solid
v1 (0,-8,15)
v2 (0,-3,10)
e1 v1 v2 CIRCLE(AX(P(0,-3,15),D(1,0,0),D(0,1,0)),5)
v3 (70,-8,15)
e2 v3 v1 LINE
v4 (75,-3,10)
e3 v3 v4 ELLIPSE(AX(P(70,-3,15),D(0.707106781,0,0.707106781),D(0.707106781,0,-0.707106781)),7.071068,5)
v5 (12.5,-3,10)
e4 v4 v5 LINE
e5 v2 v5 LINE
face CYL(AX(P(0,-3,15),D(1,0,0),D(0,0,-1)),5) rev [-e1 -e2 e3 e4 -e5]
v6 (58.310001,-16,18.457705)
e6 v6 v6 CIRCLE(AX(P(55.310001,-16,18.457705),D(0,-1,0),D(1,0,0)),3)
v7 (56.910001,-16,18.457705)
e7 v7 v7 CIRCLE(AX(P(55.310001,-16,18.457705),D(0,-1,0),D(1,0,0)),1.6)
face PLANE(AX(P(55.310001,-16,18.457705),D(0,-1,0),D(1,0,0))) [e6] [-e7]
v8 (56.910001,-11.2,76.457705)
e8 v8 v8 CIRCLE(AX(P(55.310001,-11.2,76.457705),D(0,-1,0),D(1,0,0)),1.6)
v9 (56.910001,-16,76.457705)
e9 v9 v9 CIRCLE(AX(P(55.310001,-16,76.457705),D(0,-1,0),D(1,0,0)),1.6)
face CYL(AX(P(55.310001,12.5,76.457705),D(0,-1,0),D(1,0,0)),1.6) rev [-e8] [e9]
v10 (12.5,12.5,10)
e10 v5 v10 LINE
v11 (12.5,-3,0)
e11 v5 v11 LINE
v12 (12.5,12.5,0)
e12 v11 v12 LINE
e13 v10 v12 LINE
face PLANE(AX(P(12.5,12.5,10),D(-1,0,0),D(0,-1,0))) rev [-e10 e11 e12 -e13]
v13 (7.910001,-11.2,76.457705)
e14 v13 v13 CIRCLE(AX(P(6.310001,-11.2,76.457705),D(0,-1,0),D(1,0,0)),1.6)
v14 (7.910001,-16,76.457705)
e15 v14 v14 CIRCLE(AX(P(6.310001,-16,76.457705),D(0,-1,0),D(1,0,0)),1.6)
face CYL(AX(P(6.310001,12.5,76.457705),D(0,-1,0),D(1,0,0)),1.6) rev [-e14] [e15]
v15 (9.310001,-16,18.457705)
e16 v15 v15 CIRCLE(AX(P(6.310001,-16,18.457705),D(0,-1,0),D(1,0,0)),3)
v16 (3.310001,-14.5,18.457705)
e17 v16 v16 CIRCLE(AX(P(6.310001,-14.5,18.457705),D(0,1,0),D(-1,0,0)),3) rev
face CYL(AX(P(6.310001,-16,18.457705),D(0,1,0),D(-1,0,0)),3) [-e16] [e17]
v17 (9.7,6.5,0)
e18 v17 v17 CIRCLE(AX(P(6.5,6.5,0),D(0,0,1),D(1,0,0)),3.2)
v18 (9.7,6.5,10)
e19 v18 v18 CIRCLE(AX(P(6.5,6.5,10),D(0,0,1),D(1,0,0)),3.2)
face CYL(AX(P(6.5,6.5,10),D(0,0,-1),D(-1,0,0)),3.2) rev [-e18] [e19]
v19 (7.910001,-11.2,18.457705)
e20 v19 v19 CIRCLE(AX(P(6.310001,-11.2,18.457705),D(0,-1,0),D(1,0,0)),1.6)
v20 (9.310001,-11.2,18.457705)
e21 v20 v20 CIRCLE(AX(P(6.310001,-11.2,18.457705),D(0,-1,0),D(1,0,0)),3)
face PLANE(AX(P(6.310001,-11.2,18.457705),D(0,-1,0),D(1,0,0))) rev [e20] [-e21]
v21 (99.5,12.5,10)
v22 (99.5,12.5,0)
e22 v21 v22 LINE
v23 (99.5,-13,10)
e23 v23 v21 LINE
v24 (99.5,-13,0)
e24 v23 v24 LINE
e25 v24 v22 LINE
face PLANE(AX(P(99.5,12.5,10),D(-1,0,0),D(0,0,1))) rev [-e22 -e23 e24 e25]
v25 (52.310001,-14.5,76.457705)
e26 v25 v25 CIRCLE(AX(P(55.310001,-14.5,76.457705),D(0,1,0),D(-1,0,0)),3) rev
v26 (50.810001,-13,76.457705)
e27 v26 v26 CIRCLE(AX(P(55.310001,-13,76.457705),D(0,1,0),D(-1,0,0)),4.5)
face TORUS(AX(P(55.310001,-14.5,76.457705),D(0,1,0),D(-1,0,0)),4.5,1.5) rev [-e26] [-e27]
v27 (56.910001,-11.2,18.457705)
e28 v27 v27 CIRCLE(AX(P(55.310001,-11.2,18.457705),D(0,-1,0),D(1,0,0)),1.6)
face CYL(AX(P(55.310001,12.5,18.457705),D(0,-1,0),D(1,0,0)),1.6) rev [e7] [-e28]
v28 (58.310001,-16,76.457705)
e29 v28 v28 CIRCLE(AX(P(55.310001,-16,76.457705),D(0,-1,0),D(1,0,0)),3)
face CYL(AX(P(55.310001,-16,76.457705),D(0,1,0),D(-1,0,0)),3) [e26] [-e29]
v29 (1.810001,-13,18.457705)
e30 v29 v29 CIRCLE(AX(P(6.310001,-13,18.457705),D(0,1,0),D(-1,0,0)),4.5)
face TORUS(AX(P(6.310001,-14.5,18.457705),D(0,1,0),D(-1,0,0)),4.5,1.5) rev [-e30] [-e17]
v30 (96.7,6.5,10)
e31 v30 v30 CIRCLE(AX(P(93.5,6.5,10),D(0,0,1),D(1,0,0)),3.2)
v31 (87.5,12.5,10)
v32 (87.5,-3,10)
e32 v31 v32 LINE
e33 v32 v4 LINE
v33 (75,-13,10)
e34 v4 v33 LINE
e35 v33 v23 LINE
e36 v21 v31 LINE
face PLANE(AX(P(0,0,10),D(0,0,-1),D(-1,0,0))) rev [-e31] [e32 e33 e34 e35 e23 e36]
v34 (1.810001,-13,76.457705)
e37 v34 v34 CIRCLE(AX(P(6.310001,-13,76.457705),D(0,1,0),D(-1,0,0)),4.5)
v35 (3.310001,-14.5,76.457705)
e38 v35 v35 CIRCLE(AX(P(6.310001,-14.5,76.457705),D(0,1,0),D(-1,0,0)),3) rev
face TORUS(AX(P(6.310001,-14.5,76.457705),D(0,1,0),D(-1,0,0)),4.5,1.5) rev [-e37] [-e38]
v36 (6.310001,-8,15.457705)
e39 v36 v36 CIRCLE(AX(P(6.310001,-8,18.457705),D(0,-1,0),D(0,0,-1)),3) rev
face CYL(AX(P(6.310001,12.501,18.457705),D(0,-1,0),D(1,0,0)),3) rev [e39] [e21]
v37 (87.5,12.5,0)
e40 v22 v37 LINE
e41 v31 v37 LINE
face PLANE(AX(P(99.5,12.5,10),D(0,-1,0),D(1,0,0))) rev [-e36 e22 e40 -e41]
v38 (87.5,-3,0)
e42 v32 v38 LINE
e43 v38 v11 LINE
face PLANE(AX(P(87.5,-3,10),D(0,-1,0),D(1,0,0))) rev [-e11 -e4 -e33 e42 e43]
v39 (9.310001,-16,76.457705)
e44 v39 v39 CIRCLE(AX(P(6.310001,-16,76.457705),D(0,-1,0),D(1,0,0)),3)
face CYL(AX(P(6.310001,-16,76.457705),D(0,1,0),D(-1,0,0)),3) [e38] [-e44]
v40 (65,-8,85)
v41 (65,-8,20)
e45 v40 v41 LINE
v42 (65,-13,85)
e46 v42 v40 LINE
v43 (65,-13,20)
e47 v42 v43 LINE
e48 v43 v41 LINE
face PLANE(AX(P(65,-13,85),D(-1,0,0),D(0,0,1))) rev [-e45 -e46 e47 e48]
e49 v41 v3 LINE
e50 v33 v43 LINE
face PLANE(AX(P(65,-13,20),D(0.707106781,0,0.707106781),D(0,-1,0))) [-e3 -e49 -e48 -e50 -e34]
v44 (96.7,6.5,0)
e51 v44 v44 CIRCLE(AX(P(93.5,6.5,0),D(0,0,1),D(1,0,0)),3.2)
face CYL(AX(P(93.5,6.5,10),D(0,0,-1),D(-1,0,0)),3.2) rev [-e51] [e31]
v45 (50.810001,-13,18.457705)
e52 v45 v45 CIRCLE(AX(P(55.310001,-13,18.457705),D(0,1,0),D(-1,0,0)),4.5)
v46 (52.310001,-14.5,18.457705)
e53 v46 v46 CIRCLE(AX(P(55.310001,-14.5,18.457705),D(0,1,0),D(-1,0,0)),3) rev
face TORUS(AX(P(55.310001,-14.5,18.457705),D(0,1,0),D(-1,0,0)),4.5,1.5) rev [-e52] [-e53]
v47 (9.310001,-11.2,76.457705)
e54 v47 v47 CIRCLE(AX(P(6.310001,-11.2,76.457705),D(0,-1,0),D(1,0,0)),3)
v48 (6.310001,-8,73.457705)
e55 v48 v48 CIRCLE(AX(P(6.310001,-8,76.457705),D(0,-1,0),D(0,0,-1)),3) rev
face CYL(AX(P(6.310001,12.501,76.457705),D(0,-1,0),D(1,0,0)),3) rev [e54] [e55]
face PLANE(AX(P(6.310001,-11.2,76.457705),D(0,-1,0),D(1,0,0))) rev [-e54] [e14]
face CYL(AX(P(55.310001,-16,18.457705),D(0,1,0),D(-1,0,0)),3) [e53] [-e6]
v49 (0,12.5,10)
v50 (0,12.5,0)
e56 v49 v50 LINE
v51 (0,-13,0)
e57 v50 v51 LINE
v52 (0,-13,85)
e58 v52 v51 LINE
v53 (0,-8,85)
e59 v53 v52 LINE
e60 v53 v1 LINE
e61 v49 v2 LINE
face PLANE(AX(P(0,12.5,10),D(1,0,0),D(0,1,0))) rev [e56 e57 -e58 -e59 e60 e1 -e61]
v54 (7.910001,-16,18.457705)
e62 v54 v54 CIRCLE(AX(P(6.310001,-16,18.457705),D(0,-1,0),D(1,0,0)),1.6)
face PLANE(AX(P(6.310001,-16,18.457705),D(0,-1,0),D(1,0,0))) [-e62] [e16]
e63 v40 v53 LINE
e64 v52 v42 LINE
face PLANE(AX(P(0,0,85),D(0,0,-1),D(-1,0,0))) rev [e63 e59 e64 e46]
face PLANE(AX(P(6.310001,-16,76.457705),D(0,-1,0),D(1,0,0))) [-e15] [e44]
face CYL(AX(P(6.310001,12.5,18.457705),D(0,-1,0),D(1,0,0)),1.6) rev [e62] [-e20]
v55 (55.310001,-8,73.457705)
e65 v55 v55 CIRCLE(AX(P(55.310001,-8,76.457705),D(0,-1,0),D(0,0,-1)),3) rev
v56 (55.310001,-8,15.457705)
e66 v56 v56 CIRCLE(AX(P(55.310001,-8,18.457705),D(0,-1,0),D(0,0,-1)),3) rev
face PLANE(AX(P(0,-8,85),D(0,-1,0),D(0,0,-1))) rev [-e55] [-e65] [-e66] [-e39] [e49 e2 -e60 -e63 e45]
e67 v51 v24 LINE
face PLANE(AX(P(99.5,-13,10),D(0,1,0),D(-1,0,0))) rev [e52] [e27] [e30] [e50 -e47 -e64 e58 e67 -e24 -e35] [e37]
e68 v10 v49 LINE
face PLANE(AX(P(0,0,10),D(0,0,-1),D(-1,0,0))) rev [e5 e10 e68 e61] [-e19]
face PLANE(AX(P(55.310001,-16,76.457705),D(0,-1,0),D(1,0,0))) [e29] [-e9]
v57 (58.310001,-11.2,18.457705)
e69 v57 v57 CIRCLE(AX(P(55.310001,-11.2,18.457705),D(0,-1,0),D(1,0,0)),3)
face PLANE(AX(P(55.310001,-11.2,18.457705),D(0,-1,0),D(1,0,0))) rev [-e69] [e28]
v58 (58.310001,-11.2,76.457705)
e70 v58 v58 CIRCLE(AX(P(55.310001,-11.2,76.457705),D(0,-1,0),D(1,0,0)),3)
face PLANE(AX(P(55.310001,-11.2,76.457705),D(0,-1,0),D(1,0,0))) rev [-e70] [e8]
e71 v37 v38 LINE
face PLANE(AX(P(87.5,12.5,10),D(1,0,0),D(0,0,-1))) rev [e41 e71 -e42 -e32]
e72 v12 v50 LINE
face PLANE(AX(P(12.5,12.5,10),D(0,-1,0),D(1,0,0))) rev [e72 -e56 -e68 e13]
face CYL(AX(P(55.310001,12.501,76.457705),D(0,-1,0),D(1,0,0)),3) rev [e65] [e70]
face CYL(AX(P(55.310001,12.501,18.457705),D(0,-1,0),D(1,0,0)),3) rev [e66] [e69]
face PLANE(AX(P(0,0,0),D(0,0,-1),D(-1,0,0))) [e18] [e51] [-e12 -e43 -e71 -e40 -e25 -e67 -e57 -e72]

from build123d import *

# Parameters (mm, degrees)
SKETCH1_R               = 3.2
BOSS_EXTRUDE1_DEPTH     = 10
SKETCH2_W               = 65
SKETCH2_H               = 5
BOSS_EXTRUDE2_DEPTH     = 75
SKETCH4_R               = 3
BOSS_EXTRUDE3_DEPTH     = 3
CUT_EXTRUDE1_REACH      = 137.125
CUT_EXTRUDE1_START      = -1.8
SKETCH4_2_R             = 3
CUT_EXTRUDE2_DEPTH      = 134.324791393
CUT_EXTRUDE2_DEPTH_BACK = 134.324791393
SKETCH3_R               = 1.6
FILLET1_R               = 5
CHAMFER1_SIZE           = 10
FILLET2_R               = 1.5


with BuildPart() as part:
    # Sketch1 → Boss-Extrude1 (new body)
    with BuildSketch(Plane.XY):
        Polygon((99.5, 12.5), (87.5, 12.5), (87.5, -3), (12.5, -3), (12.5, 12.5), (0, 12.5), (0, -13), (99.5, -13), align=None)
        with Locations((93.5, 6.5)):
            Circle(SKETCH1_R, mode=Mode.SUBTRACT)
        with Locations((6.5, 6.5)):
            Circle(SKETCH1_R, mode=Mode.SUBTRACT)
    extrude(amount=BOSS_EXTRUDE1_DEPTH)

    # Sketch2 → Boss-Extrude2 (add)
    with BuildSketch(Plane.XY.offset(10)):
        with Locations((32.5, -10.5)):
            Rectangle(SKETCH2_W, SKETCH2_H)
    extrude(amount=BOSS_EXTRUDE2_DEPTH)

    # Sketch4 → Boss-Extrude3 (add)
    with BuildSketch(Plane.XZ.offset(13)):
        with Locations(Location((6.31000124, 76.457704619, 0), (0, 0, 180))):
            Circle(SKETCH4_R)
        with Locations(Location((55.31000124, 76.457704619, 0), (0, 0, 180))):
            Circle(SKETCH4_R)
        with Locations(Location((55.31000124, 18.457704619, 0), (0, 0, 180))):
            Circle(SKETCH4_R)
        with Locations(Location((6.31000124, 18.457704619, 0), (0, 0, 180))):
            Circle(SKETCH4_R)
    extrude(amount=BOSS_EXTRUDE3_DEPTH)

    # Sketch4<2> → Cut-Extrude1 (cut, up to next)
    with BuildSketch(Plane.XZ.offset(13).offset(CUT_EXTRUDE1_START), mode=Mode.PRIVATE) as cut_extrude1_sk1:
        with Locations(Location((6.31000124, 76.457704619, 0), (0, 0, 180))):
            Circle(SKETCH4_2_R)
    cut_extrude1_tool1 = extrude(cut_extrude1_sk1.sketch, amount=-CUT_EXTRUDE1_REACH, mode=Mode.PRIVATE) & part.part
    # Sketch4<2> → Cut-Extrude1 (cut, up to next)
    with BuildSketch(Plane.XZ.offset(13).offset(CUT_EXTRUDE1_START), mode=Mode.PRIVATE) as cut_extrude1_sk2:
        with Locations(Location((55.31000124, 76.457704619, 0), (0, 0, 180))):
            Circle(SKETCH4_2_R)
    cut_extrude1_tool2 = extrude(cut_extrude1_sk2.sketch, amount=-CUT_EXTRUDE1_REACH, mode=Mode.PRIVATE) & part.part
    # Sketch4<2> → Cut-Extrude1 (cut, up to next)
    with BuildSketch(Plane.XZ.offset(13).offset(CUT_EXTRUDE1_START), mode=Mode.PRIVATE) as cut_extrude1_sk3:
        with Locations(Location((55.31000124, 18.457704619, 0), (0, 0, 180))):
            Circle(SKETCH4_2_R)
    cut_extrude1_tool3 = extrude(cut_extrude1_sk3.sketch, amount=-CUT_EXTRUDE1_REACH, mode=Mode.PRIVATE) & part.part
    # Sketch4<2> → Cut-Extrude1 (cut, up to next)
    with BuildSketch(Plane.XZ.offset(13).offset(CUT_EXTRUDE1_START), mode=Mode.PRIVATE) as cut_extrude1_sk4:
        with Locations(Location((6.31000124, 18.457704619, 0), (0, 0, 180))):
            Circle(SKETCH4_2_R)
    cut_extrude1_tool4 = extrude(cut_extrude1_sk4.sketch, amount=-CUT_EXTRUDE1_REACH, mode=Mode.PRIVATE) & part.part
    add(cut_extrude1_tool1.solids().sort_by_distance((6.310001, -11.2, 76.457705))[0], mode=Mode.SUBTRACT)
    add(cut_extrude1_tool2.solids().sort_by_distance((55.310001, -11.2, 76.457705))[0], mode=Mode.SUBTRACT)
    add(cut_extrude1_tool3.solids().sort_by_distance((55.310001, -11.2, 18.457705))[0], mode=Mode.SUBTRACT)
    add(cut_extrude1_tool4.solids().sort_by_distance((6.310001, -11.2, 18.457705))[0], mode=Mode.SUBTRACT)

    # Sketch3 → Cut-Extrude2 (cut, two sides: drawn at the far end of the back side and taken through both)
    with BuildSketch(Plane.XZ.offset(13).offset(-CUT_EXTRUDE2_DEPTH_BACK)):
        with Locations((6.31000124, 76.457704619)):
            Circle(SKETCH3_R)
        with Locations((55.31000124, 76.457704619)):
            Circle(SKETCH3_R)
        with Locations((6.31000124, 18.457704619)):
            Circle(SKETCH3_R)
        with Locations((55.31000124, 18.457704619)):
            Circle(SKETCH3_R)
    extrude(amount=CUT_EXTRUDE2_DEPTH + CUT_EXTRUDE2_DEPTH_BACK, mode=Mode.SUBTRACT)

    # Fillet1
    fillet1_edges = [part.edges().sort_by_distance(p)[0] for p in [
        (32.5, -8, 10),
    ]]
    fillet(fillet1_edges, radius=FILLET1_R - 0.0001)  # a hair under: the kernel refuses the full size

    # Chamfer1
    chamfer1_edges = [part.edges().sort_by_distance(p)[0] for p in [
        (65, -8.00005, 10),
    ]]
    chamfer(chamfer1_edges, length=CHAMFER1_SIZE)

    # Fillet2
    fillet2_edges = [part.edges().sort_by_distance(p)[0] for p in [
        (9.31000124, -13, 76.457704619),
        (58.31000124, -13, 76.457704619),
        (58.31000124, -13, 18.457704619),
        (9.31000124, -13, 18.457704619),
    ]]
    fillet(fillet2_edges, radius=FILLET2_R)


solid = part.part
